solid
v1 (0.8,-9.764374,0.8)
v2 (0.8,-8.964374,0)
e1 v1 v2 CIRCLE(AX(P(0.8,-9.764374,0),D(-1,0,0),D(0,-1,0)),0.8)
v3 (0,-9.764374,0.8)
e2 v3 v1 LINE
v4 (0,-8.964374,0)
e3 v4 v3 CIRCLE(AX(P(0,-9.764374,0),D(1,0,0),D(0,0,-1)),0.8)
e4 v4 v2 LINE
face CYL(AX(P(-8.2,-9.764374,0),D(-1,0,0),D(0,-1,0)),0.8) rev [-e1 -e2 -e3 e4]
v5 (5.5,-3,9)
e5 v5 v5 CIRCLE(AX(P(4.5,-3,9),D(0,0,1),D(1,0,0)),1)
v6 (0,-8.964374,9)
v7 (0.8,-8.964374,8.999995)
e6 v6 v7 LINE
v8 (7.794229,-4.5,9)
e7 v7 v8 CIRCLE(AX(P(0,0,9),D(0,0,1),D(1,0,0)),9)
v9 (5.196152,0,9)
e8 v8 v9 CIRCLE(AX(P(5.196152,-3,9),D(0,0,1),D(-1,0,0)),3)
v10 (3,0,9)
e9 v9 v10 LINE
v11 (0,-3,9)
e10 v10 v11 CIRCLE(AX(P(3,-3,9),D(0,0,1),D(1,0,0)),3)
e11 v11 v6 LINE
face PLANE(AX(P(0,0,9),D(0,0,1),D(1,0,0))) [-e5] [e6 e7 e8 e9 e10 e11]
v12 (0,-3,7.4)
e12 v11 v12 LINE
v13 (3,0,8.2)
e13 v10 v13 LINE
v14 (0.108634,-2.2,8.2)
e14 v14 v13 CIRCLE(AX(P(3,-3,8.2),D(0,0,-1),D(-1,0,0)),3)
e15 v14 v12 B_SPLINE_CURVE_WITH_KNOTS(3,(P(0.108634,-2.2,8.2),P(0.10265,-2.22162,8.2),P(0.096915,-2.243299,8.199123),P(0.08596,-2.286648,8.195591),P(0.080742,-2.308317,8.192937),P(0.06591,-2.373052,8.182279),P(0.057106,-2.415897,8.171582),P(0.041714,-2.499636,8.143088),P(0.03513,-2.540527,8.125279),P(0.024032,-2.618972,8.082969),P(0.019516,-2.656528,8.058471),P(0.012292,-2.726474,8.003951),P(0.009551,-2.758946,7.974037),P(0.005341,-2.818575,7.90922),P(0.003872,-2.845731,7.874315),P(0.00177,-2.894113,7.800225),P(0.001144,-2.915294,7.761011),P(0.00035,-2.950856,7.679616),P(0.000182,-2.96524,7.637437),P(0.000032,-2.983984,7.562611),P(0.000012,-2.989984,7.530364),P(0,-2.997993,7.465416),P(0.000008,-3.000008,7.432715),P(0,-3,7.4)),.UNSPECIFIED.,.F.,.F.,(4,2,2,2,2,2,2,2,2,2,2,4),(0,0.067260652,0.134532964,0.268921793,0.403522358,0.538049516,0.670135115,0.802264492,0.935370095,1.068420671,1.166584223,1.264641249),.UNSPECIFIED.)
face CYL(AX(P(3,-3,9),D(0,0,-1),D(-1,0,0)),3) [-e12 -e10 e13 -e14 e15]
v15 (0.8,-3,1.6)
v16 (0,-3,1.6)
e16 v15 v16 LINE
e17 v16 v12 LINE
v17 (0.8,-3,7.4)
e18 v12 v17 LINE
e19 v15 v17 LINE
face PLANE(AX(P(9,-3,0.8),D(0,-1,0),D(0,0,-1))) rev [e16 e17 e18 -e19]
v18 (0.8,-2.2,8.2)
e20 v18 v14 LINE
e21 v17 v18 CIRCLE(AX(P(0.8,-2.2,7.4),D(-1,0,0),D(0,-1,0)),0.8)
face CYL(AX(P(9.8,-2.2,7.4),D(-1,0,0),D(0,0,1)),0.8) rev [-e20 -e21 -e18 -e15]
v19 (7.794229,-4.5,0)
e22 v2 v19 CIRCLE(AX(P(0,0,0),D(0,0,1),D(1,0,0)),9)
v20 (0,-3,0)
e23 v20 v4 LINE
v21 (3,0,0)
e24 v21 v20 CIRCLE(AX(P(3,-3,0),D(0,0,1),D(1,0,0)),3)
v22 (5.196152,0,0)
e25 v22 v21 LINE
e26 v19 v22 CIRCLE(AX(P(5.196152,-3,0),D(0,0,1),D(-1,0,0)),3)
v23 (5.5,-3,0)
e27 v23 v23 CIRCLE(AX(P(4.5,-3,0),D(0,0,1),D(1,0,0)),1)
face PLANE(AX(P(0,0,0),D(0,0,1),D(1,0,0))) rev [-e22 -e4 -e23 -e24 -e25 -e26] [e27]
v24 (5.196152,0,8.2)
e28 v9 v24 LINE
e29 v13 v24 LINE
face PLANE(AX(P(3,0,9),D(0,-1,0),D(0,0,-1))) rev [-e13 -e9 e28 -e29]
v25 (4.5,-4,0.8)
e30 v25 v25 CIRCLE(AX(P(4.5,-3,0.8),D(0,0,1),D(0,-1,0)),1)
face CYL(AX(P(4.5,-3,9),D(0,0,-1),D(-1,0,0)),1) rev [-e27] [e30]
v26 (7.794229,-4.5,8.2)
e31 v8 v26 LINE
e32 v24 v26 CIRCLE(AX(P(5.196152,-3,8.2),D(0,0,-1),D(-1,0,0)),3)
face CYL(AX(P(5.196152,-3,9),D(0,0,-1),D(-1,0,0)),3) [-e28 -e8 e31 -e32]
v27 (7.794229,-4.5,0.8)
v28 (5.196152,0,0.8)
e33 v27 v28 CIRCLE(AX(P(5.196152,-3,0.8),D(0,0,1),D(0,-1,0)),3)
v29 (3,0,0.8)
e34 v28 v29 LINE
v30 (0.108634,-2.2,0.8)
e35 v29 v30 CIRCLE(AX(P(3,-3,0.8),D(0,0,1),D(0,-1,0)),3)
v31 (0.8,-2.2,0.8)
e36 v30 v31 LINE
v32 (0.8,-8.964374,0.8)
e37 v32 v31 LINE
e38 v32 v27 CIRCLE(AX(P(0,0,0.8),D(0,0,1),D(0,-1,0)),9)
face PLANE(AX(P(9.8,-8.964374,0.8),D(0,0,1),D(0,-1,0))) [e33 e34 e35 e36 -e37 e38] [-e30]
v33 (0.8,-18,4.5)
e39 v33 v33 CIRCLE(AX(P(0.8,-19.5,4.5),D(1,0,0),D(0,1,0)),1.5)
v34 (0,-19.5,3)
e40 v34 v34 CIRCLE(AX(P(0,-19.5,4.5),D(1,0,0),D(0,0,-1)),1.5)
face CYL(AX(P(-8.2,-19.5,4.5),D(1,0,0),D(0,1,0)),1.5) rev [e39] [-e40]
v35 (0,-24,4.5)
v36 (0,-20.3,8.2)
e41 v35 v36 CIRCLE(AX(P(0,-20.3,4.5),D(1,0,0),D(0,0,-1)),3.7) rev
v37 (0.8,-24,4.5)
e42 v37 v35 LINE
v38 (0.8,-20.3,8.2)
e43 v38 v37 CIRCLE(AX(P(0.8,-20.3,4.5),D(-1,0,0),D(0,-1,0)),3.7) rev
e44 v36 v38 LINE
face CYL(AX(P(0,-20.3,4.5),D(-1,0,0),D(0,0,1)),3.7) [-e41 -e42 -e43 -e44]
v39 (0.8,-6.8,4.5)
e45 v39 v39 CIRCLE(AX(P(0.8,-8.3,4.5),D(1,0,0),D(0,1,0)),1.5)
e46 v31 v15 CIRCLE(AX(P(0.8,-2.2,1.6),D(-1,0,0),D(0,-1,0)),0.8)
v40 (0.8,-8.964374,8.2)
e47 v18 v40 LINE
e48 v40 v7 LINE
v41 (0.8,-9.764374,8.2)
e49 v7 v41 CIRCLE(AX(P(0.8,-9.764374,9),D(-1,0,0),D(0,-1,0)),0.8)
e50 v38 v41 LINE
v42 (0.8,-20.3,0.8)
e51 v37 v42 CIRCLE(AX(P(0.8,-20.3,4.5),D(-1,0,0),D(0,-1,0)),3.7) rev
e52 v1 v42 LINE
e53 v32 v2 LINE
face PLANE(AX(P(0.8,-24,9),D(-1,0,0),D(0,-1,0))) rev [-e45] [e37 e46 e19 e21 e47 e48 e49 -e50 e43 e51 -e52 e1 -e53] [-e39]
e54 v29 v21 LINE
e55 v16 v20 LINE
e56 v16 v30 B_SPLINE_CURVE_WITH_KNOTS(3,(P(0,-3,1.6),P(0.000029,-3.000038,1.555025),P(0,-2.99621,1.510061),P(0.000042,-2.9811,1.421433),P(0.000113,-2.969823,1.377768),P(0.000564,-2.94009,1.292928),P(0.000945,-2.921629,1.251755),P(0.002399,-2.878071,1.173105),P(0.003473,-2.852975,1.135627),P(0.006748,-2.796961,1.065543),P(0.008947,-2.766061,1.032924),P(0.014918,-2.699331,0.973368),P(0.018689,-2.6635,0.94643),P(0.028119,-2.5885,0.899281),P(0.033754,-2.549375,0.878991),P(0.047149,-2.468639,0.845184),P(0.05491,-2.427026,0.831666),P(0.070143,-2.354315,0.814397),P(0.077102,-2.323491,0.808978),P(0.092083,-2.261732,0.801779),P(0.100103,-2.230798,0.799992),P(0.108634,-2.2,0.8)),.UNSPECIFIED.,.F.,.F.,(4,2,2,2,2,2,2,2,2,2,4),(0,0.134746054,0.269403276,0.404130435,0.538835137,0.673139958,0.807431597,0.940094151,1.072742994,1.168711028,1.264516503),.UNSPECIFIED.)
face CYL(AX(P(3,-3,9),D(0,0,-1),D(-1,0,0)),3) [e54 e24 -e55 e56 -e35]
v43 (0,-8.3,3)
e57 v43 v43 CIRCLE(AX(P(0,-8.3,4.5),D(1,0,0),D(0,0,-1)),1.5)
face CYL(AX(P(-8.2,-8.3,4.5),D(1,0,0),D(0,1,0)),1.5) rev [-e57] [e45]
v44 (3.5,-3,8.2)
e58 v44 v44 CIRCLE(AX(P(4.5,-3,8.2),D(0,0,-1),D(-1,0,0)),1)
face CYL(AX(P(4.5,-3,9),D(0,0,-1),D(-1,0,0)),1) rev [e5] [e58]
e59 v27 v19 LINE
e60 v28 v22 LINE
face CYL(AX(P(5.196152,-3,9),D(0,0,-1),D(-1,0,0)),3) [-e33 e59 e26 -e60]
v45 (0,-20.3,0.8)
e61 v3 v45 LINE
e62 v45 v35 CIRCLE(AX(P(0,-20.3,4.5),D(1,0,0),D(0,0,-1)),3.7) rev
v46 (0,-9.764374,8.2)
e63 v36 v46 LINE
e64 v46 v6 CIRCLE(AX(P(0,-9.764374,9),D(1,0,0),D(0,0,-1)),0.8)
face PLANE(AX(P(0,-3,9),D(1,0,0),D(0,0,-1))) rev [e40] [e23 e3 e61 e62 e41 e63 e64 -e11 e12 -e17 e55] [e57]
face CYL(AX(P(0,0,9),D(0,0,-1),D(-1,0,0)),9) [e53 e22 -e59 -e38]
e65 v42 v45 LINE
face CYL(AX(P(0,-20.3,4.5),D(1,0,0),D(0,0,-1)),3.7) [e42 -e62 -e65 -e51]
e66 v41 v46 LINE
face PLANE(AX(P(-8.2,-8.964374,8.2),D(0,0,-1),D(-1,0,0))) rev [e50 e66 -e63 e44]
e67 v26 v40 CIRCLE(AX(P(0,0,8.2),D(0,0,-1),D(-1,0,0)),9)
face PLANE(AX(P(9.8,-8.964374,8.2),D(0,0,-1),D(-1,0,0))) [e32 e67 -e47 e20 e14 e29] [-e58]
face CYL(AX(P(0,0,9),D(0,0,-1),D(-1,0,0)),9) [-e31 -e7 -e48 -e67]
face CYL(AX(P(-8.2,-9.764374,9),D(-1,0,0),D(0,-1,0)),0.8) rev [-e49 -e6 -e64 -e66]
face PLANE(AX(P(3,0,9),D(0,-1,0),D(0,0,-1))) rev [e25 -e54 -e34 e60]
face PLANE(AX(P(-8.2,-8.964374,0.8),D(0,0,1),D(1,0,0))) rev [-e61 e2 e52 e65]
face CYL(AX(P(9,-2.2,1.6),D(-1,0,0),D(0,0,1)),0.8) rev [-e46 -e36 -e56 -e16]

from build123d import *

# Parameters (mm, degrees)
SKETCH_1_R          = 1
EXTRUDE_1_DEPTH     = 9
SKETCH_2_W          = 7.4
SKETCH_2_H          = 10
CUT_EXTRUDE_1_DEPTH = 9
SKETCH_3_W          = 0.8
SKETCH_3_H          = 15.035626068
CUT_EXTRUDE_2_DEPTH = 9
FILLET_2_R          = 3.7
SKETCH_4_W          = 7.4
SKETCH_4_H          = 2.039607805
CUT_EXTRUDE_3_DEPTH = 9
SKETCH_5_R          = 1.5
CUT_EXTRUDE_4_DEPTH = 9
FILLET_3_R          = 0.8


# Some blends are built 0.0001 mm under size
with BuildPart() as part:
    # 草图1 → 凸台-拉伸1 (new body)
    with BuildSketch(Plane.XY):
        with BuildLine():
            Line((3, 0), (5.196152423, 0))
            ThreePointArc((5.196152423, 0), (7.794228634, -1.5), (7.794228634, -4.5))
            ThreePointArc((7.794228634, -4.5), (4.842298019, -7.586313327), (0.8, -8.964373932))
            Line((0.8, -8.964373932), (0.8, -24))
            Line((0.8, -24), (0, -24))
            Line((0, -24), (0, -3))
            ThreePointArc((0, -3), (0.878679656, -0.878679656), (3, 0))
        make_face()
        with Locations((4.5, -3)):
            Circle(SKETCH_1_R, mode=Mode.SUBTRACT)
    extrude(amount=EXTRUDE_1_DEPTH)

    # 草图2 → 切除-拉伸1 (cut)
    with BuildSketch(Plane(origin=(0.8, 0, 0), x_dir=(0, 0, -1), z_dir=(1, 0, 0))):
        with Locations((-4.5, -3.964373932)):
            Rectangle(SKETCH_2_W, SKETCH_2_H)
    extrude(amount=CUT_EXTRUDE_1_DEPTH, mode=Mode.SUBTRACT)

    # 草图3 → 切除-拉伸2 (cut)
    with BuildSketch(Plane(origin=(0.8, 0, 0), x_dir=(0, 0, -1), z_dir=(1, 0, 0))):
        with Locations((-8.6, -16.482186966)):
            Rectangle(SKETCH_3_W, SKETCH_3_H)
        with Locations((-0.4, -16.482186966)):
            Rectangle(SKETCH_3_W, SKETCH_3_H)
    extrude(amount=-CUT_EXTRUDE_2_DEPTH, mode=Mode.SUBTRACT)

    # 圆角2
    fillet_2_edges = [part.edges().sort_by_distance(p)[0] for p in [
        (0.4, -24, 0.8),
        (0.4, -24, 8.2),
    ]]
    fillet(fillet_2_edges, radius=FILLET_2_R - 0.0001)  # a hair under: the kernel refuses the full size

    # 草图4 → 切除-拉伸3 (cut)
    with BuildSketch(Plane.ZY):
        with Locations((4.5, -1.980196097)):
            Rectangle(SKETCH_4_W, SKETCH_4_H)
    extrude(amount=-CUT_EXTRUDE_3_DEPTH, mode=Mode.SUBTRACT)

    # 草图5 → 切除-拉伸4 (cut)
    with BuildSketch(Plane(origin=(0.8, 0, 0), x_dir=(0, 0, -1), z_dir=(1, 0, 0))):
        with Locations(Location((-4.5, -8.3, 0), (0, 0, 90))):
            Circle(SKETCH_5_R)
        with Locations(Location((-4.5, -19.5, 0), (0, 0, 90))):
            Circle(SKETCH_5_R)
    extrude(amount=-CUT_EXTRUDE_4_DEPTH, mode=Mode.SUBTRACT)

    # 圆角3
    # the kernel refuses this fillet: 0.8 mm, written as the material it adds along each edge
    with BuildSketch(Plane(origin=(0.8, -8.964373932, 0.8), x_dir=(0, -1, 0), z_dir=(-1, 0, 0))) as fillet_3_piece_1:
        with BuildLine():
            CenterArc((FILLET_3_R, -FILLET_3_R), FILLET_3_R, 90, 90)
            Line((0, -FILLET_3_R), (0, 0))
            Line((0, 0), (FILLET_3_R, 0))
        make_face()
    extrude(amount=0.8)
    with BuildSketch(Plane(origin=(0.8, -8.964373932, 8.2), x_dir=(0, -1, 0), z_dir=(-1, 0, 0))) as fillet_3_piece_2:
        with BuildLine():
            CenterArc((FILLET_3_R, FILLET_3_R), FILLET_3_R, 180, 90)
            Line((0, FILLET_3_R), (0, 0))
            Line((0, 0), (FILLET_3_R, 0))
        make_face()
    extrude(amount=0.8)
    with BuildSketch(Plane(origin=(-2, -3, 0.8), x_dir=(0, 0, 1), z_dir=(1, 0, 0))) as fillet_3_piece_3_section:
        with BuildLine():
            CenterArc((FILLET_3_R, -FILLET_3_R), FILLET_3_R, 90, 90)
            Line((0, -FILLET_3_R), (0, 0))
            Line((0, 0), (FILLET_3_R, 0))
        make_face()
    fillet_3_piece_3 = extrude(amount=2.8, mode=Mode.PRIVATE)
    fillet_3_piece_3 = fillet_3_piece_3 & Plane(origin=(3, -3, 0.979954946), x_dir=(-1, 0, 0), z_dir=(0, 0, -1)) * Cylinder(3, 9, mode=Mode.PRIVATE)
    add(fillet_3_piece_3)
    with BuildSketch(Plane(origin=(-2, -3, 8.2), x_dir=(0, 0, -1), z_dir=(1, 0, 0))) as fillet_3_piece_4_section:
        with BuildLine():
            CenterArc((FILLET_3_R, FILLET_3_R), FILLET_3_R, 180, 90)
            Line((0, FILLET_3_R), (0, 0))
            Line((0, 0), (FILLET_3_R, 0))
        make_face()
    fillet_3_piece_4 = extrude(amount=2.8, mode=Mode.PRIVATE)
    fillet_3_piece_4 = fillet_3_piece_4 & Plane(origin=(3, -3, 8.020045054), x_dir=(-1, 0, 0), z_dir=(0, 0, -1)) * Cylinder(3, 9, mode=Mode.PRIVATE)
    add(fillet_3_piece_4)


solid = part.part
